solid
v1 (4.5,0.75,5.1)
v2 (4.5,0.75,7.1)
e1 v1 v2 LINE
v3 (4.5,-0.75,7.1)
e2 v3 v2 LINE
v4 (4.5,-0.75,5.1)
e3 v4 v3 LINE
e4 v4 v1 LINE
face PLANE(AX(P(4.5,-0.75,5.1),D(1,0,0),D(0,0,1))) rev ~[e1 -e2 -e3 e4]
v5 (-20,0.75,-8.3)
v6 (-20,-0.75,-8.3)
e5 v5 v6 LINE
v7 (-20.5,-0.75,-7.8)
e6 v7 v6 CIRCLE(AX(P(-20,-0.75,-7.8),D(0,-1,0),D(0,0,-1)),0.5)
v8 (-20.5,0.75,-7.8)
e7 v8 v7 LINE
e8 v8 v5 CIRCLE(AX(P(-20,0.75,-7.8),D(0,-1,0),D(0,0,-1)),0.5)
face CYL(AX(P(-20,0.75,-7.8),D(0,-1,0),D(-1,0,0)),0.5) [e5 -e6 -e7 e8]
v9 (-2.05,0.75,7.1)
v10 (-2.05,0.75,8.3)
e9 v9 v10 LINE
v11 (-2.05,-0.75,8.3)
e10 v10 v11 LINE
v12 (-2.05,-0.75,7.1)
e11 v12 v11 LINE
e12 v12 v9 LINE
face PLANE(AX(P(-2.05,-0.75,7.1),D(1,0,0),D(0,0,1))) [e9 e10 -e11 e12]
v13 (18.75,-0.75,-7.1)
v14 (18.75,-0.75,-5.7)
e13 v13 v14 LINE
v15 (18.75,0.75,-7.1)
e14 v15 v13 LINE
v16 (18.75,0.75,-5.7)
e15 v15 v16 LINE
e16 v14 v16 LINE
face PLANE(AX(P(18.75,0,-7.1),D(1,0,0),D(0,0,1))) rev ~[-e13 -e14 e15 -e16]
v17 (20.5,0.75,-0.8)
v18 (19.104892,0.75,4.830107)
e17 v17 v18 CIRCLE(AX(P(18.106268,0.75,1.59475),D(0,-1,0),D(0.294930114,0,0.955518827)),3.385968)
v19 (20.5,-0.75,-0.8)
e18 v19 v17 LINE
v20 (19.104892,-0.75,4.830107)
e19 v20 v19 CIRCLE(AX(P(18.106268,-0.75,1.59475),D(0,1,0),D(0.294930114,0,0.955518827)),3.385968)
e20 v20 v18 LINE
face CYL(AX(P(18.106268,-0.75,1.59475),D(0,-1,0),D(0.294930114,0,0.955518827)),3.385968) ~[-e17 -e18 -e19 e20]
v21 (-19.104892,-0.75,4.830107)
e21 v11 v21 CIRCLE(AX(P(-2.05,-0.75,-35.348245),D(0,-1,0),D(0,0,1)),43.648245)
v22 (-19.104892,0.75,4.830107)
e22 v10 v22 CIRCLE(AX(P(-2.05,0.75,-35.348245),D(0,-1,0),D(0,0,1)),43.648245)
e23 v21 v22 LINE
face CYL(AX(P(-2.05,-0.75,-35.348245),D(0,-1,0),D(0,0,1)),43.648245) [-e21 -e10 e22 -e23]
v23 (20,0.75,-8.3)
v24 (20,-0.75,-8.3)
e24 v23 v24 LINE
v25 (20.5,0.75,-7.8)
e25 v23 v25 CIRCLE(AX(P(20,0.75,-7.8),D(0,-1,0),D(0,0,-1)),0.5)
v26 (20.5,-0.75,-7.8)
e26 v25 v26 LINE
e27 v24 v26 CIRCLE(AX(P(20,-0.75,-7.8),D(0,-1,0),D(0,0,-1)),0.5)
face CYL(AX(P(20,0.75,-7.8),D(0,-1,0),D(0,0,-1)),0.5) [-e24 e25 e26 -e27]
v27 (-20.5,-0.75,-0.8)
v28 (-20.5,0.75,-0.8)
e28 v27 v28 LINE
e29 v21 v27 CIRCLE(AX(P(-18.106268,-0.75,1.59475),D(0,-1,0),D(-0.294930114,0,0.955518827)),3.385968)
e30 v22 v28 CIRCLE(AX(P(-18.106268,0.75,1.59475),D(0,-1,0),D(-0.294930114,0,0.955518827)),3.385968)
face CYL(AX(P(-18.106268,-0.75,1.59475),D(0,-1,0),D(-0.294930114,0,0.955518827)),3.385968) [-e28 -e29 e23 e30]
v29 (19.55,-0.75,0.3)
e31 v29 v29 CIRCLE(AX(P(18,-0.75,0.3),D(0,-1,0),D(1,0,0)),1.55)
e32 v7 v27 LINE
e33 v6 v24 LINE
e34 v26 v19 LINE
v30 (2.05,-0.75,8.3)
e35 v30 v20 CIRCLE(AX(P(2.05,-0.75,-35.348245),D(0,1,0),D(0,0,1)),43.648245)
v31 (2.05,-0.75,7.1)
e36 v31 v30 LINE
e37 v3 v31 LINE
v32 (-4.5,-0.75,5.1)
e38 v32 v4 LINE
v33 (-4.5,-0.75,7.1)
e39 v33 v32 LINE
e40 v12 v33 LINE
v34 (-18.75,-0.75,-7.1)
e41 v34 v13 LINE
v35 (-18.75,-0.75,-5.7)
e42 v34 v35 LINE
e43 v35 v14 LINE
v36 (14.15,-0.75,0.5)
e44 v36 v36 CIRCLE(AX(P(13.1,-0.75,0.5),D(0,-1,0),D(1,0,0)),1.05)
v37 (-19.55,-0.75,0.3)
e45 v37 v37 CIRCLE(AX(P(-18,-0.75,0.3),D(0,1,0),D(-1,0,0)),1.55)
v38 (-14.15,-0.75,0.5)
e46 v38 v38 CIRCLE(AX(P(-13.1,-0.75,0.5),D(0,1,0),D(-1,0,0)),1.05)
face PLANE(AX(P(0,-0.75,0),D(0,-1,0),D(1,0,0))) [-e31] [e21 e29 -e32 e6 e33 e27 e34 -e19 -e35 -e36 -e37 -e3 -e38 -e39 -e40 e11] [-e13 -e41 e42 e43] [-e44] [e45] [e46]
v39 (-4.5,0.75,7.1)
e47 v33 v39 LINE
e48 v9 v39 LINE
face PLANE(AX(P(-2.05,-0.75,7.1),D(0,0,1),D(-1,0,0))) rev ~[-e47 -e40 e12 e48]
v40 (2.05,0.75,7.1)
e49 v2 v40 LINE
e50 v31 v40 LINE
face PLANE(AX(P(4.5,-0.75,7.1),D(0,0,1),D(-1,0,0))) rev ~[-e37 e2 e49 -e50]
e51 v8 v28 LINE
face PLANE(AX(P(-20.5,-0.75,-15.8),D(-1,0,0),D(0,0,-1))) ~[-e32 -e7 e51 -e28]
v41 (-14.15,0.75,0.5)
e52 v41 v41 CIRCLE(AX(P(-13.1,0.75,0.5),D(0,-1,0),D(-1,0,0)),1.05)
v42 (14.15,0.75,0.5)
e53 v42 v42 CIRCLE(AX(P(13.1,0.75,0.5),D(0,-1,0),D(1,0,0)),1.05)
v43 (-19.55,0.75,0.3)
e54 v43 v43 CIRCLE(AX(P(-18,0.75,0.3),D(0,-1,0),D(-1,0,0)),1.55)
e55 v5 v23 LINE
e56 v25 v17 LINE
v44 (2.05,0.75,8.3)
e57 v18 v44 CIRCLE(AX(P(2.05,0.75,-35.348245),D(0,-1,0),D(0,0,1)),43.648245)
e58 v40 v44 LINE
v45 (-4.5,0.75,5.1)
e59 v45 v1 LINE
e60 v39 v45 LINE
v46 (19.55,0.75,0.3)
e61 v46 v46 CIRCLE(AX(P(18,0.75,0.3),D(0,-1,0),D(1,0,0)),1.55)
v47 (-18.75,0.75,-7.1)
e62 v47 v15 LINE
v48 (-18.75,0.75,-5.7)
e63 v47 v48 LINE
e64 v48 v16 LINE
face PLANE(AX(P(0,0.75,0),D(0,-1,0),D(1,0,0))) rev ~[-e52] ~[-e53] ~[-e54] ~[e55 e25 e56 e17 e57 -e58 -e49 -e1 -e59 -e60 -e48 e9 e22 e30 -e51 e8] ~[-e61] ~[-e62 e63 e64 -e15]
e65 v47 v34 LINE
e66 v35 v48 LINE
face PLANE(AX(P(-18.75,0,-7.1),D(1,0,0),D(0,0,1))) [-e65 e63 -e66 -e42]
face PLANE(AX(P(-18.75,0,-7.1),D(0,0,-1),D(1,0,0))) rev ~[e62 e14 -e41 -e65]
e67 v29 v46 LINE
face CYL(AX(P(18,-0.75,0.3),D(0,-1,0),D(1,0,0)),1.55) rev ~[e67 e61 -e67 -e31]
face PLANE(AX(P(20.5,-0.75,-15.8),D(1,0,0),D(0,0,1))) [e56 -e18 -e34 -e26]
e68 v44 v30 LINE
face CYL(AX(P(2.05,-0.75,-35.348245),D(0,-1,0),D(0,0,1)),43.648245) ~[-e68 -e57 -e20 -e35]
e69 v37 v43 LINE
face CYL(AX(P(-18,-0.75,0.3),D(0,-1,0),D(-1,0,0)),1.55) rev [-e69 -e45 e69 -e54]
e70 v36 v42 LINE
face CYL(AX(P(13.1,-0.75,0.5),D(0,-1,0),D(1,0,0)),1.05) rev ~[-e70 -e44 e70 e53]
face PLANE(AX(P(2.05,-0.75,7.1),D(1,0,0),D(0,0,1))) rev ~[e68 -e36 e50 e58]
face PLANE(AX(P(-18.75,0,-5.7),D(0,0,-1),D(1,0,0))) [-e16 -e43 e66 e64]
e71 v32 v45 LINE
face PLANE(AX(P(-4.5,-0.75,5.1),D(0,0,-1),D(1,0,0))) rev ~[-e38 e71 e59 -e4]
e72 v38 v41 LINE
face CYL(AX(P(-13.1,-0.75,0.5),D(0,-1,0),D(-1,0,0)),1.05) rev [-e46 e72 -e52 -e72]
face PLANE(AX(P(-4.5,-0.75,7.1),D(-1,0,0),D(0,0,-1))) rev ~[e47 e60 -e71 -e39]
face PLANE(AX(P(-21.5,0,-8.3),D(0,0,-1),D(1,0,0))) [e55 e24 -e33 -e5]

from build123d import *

# Parameters (mm, degrees)
F0_W      = 43
F0_H      = 16.6
F1_DEPTH  = 0.75
F2_W      = 37.5
F2_H      = 1.4
F3_DEPTH  = 75
F5_R      = 1.05
F5_R_2    = 1.55
F6_DEPTH  = 1.501
F7_W      = 4.1
F7_H      = 1.9489285067
F7_H_2    = 0.8016004696
F7_W_2    = 2
F7_H_3    = 15
F8_DEPTH  = 1.501
F10_DEPTH = 1.501
F11_R     = 0.5


# Not quite as in the source:
# - a feature of the source that left no trace in its solid (it failed there, or was rolled back) is left out
# - a pattern or mirror of a feature is missing from the dataset's text; its kind, count and spacing are read off the source's solid


with BuildPart() as f1:
    # F0 (on Front) → F1 (new body, symmetric)
    with BuildSketch(Plane.XZ):
        Rectangle(F0_W, F0_H)
    extrude(amount=F1_DEPTH, both=True)

    # F2 (on Front) → F3 (cut, symmetric)
    with BuildSketch(Plane.XZ):
        with Locations((0, -6.4)):
            Rectangle(F2_W, F2_H)
    extrude(amount=F3_DEPTH, both=True, mode=Mode.SUBTRACT)

    # F5 (on face) → F6 (cut, through all)
    with BuildSketch(Plane.XZ.offset(0.75)):
        with Locations((13.1, 0.5)):
            Circle(F5_R)
        with Locations((18, 0.3)):
            Circle(F5_R_2)
    f6 = extrude(amount=-F6_DEPTH, mode=Mode.SUBTRACT)

    # F6_copies: F6 across plane
    add(f6.mirror(Plane(origin=(0, 0, 0), x_dir=(0, 0, -1), z_dir=(-1, 0, 0))), mode=Mode.SUBTRACT)

    # F7 (on face) → F8 (cut, through all)
    with BuildSketch(Plane.XZ.offset(0.75)):
        Polygon((-2.05, 7.1), (-4.5, 7.1), (-4.5, 5.1), (4.5, 5.1), (4.5, 7.1), (2.05, 7.1), (2.05, 6.2983995304), (-2.05, 6.2983995304), align=None)
        with Locations((0, 8.0744642533)):
            Rectangle(F7_W, F7_H)
        with Locations((0, 6.6991997652)):
            Rectangle(F7_W, F7_H_2)
        with Locations((21.5, -8.3)):
            Rectangle(F7_W_2, F7_H_3)
    f8 = extrude(amount=-F8_DEPTH, mode=Mode.SUBTRACT)

    # F8_copies: F8 across plane
    add(f8.mirror(Plane(origin=(0, 0, 0), x_dir=(0, 0, -1), z_dir=(-1, 0, 0))), mode=Mode.SUBTRACT)

    # F9 (on face) → F10 (cut, through all)
    with BuildSketch(Plane.XZ.offset(0.75)):
        with BuildLine():
            ThreePointArc((2.05, 8.3), (10.75214793, 7.4237307967), (19.104892388, 4.8301066272))
            ThreePointArc((19.104892388, 4.8301066272), (21.392838702, 2.4091433089), (20.5, -0.8))
            Line((20.5, -0.8), (29.8848059028, -7.0995693095))
            Line((29.8848059028, -7.0995693095), (22.5688572973, 15.8109050244))
            Line((22.5688572973, 15.8109050244), (2.05, 8.3))
        make_face()
    f10 = extrude(amount=-F10_DEPTH, mode=Mode.SUBTRACT)

    # F10_copies: F10 across plane
    add(f10.mirror(Plane(origin=(0, 0, 0), x_dir=(0, 0, -1), z_dir=(-1, 0, 0))), mode=Mode.SUBTRACT)

    # F11
    f11_edges = [f1.edges().sort_by_distance(p)[0] for p in [
        (20.5, 0, -8.3),
        (-20.5, 0, -8.3),
    ]]
    fillet(f11_edges, radius=F11_R)


solid = f1.part
